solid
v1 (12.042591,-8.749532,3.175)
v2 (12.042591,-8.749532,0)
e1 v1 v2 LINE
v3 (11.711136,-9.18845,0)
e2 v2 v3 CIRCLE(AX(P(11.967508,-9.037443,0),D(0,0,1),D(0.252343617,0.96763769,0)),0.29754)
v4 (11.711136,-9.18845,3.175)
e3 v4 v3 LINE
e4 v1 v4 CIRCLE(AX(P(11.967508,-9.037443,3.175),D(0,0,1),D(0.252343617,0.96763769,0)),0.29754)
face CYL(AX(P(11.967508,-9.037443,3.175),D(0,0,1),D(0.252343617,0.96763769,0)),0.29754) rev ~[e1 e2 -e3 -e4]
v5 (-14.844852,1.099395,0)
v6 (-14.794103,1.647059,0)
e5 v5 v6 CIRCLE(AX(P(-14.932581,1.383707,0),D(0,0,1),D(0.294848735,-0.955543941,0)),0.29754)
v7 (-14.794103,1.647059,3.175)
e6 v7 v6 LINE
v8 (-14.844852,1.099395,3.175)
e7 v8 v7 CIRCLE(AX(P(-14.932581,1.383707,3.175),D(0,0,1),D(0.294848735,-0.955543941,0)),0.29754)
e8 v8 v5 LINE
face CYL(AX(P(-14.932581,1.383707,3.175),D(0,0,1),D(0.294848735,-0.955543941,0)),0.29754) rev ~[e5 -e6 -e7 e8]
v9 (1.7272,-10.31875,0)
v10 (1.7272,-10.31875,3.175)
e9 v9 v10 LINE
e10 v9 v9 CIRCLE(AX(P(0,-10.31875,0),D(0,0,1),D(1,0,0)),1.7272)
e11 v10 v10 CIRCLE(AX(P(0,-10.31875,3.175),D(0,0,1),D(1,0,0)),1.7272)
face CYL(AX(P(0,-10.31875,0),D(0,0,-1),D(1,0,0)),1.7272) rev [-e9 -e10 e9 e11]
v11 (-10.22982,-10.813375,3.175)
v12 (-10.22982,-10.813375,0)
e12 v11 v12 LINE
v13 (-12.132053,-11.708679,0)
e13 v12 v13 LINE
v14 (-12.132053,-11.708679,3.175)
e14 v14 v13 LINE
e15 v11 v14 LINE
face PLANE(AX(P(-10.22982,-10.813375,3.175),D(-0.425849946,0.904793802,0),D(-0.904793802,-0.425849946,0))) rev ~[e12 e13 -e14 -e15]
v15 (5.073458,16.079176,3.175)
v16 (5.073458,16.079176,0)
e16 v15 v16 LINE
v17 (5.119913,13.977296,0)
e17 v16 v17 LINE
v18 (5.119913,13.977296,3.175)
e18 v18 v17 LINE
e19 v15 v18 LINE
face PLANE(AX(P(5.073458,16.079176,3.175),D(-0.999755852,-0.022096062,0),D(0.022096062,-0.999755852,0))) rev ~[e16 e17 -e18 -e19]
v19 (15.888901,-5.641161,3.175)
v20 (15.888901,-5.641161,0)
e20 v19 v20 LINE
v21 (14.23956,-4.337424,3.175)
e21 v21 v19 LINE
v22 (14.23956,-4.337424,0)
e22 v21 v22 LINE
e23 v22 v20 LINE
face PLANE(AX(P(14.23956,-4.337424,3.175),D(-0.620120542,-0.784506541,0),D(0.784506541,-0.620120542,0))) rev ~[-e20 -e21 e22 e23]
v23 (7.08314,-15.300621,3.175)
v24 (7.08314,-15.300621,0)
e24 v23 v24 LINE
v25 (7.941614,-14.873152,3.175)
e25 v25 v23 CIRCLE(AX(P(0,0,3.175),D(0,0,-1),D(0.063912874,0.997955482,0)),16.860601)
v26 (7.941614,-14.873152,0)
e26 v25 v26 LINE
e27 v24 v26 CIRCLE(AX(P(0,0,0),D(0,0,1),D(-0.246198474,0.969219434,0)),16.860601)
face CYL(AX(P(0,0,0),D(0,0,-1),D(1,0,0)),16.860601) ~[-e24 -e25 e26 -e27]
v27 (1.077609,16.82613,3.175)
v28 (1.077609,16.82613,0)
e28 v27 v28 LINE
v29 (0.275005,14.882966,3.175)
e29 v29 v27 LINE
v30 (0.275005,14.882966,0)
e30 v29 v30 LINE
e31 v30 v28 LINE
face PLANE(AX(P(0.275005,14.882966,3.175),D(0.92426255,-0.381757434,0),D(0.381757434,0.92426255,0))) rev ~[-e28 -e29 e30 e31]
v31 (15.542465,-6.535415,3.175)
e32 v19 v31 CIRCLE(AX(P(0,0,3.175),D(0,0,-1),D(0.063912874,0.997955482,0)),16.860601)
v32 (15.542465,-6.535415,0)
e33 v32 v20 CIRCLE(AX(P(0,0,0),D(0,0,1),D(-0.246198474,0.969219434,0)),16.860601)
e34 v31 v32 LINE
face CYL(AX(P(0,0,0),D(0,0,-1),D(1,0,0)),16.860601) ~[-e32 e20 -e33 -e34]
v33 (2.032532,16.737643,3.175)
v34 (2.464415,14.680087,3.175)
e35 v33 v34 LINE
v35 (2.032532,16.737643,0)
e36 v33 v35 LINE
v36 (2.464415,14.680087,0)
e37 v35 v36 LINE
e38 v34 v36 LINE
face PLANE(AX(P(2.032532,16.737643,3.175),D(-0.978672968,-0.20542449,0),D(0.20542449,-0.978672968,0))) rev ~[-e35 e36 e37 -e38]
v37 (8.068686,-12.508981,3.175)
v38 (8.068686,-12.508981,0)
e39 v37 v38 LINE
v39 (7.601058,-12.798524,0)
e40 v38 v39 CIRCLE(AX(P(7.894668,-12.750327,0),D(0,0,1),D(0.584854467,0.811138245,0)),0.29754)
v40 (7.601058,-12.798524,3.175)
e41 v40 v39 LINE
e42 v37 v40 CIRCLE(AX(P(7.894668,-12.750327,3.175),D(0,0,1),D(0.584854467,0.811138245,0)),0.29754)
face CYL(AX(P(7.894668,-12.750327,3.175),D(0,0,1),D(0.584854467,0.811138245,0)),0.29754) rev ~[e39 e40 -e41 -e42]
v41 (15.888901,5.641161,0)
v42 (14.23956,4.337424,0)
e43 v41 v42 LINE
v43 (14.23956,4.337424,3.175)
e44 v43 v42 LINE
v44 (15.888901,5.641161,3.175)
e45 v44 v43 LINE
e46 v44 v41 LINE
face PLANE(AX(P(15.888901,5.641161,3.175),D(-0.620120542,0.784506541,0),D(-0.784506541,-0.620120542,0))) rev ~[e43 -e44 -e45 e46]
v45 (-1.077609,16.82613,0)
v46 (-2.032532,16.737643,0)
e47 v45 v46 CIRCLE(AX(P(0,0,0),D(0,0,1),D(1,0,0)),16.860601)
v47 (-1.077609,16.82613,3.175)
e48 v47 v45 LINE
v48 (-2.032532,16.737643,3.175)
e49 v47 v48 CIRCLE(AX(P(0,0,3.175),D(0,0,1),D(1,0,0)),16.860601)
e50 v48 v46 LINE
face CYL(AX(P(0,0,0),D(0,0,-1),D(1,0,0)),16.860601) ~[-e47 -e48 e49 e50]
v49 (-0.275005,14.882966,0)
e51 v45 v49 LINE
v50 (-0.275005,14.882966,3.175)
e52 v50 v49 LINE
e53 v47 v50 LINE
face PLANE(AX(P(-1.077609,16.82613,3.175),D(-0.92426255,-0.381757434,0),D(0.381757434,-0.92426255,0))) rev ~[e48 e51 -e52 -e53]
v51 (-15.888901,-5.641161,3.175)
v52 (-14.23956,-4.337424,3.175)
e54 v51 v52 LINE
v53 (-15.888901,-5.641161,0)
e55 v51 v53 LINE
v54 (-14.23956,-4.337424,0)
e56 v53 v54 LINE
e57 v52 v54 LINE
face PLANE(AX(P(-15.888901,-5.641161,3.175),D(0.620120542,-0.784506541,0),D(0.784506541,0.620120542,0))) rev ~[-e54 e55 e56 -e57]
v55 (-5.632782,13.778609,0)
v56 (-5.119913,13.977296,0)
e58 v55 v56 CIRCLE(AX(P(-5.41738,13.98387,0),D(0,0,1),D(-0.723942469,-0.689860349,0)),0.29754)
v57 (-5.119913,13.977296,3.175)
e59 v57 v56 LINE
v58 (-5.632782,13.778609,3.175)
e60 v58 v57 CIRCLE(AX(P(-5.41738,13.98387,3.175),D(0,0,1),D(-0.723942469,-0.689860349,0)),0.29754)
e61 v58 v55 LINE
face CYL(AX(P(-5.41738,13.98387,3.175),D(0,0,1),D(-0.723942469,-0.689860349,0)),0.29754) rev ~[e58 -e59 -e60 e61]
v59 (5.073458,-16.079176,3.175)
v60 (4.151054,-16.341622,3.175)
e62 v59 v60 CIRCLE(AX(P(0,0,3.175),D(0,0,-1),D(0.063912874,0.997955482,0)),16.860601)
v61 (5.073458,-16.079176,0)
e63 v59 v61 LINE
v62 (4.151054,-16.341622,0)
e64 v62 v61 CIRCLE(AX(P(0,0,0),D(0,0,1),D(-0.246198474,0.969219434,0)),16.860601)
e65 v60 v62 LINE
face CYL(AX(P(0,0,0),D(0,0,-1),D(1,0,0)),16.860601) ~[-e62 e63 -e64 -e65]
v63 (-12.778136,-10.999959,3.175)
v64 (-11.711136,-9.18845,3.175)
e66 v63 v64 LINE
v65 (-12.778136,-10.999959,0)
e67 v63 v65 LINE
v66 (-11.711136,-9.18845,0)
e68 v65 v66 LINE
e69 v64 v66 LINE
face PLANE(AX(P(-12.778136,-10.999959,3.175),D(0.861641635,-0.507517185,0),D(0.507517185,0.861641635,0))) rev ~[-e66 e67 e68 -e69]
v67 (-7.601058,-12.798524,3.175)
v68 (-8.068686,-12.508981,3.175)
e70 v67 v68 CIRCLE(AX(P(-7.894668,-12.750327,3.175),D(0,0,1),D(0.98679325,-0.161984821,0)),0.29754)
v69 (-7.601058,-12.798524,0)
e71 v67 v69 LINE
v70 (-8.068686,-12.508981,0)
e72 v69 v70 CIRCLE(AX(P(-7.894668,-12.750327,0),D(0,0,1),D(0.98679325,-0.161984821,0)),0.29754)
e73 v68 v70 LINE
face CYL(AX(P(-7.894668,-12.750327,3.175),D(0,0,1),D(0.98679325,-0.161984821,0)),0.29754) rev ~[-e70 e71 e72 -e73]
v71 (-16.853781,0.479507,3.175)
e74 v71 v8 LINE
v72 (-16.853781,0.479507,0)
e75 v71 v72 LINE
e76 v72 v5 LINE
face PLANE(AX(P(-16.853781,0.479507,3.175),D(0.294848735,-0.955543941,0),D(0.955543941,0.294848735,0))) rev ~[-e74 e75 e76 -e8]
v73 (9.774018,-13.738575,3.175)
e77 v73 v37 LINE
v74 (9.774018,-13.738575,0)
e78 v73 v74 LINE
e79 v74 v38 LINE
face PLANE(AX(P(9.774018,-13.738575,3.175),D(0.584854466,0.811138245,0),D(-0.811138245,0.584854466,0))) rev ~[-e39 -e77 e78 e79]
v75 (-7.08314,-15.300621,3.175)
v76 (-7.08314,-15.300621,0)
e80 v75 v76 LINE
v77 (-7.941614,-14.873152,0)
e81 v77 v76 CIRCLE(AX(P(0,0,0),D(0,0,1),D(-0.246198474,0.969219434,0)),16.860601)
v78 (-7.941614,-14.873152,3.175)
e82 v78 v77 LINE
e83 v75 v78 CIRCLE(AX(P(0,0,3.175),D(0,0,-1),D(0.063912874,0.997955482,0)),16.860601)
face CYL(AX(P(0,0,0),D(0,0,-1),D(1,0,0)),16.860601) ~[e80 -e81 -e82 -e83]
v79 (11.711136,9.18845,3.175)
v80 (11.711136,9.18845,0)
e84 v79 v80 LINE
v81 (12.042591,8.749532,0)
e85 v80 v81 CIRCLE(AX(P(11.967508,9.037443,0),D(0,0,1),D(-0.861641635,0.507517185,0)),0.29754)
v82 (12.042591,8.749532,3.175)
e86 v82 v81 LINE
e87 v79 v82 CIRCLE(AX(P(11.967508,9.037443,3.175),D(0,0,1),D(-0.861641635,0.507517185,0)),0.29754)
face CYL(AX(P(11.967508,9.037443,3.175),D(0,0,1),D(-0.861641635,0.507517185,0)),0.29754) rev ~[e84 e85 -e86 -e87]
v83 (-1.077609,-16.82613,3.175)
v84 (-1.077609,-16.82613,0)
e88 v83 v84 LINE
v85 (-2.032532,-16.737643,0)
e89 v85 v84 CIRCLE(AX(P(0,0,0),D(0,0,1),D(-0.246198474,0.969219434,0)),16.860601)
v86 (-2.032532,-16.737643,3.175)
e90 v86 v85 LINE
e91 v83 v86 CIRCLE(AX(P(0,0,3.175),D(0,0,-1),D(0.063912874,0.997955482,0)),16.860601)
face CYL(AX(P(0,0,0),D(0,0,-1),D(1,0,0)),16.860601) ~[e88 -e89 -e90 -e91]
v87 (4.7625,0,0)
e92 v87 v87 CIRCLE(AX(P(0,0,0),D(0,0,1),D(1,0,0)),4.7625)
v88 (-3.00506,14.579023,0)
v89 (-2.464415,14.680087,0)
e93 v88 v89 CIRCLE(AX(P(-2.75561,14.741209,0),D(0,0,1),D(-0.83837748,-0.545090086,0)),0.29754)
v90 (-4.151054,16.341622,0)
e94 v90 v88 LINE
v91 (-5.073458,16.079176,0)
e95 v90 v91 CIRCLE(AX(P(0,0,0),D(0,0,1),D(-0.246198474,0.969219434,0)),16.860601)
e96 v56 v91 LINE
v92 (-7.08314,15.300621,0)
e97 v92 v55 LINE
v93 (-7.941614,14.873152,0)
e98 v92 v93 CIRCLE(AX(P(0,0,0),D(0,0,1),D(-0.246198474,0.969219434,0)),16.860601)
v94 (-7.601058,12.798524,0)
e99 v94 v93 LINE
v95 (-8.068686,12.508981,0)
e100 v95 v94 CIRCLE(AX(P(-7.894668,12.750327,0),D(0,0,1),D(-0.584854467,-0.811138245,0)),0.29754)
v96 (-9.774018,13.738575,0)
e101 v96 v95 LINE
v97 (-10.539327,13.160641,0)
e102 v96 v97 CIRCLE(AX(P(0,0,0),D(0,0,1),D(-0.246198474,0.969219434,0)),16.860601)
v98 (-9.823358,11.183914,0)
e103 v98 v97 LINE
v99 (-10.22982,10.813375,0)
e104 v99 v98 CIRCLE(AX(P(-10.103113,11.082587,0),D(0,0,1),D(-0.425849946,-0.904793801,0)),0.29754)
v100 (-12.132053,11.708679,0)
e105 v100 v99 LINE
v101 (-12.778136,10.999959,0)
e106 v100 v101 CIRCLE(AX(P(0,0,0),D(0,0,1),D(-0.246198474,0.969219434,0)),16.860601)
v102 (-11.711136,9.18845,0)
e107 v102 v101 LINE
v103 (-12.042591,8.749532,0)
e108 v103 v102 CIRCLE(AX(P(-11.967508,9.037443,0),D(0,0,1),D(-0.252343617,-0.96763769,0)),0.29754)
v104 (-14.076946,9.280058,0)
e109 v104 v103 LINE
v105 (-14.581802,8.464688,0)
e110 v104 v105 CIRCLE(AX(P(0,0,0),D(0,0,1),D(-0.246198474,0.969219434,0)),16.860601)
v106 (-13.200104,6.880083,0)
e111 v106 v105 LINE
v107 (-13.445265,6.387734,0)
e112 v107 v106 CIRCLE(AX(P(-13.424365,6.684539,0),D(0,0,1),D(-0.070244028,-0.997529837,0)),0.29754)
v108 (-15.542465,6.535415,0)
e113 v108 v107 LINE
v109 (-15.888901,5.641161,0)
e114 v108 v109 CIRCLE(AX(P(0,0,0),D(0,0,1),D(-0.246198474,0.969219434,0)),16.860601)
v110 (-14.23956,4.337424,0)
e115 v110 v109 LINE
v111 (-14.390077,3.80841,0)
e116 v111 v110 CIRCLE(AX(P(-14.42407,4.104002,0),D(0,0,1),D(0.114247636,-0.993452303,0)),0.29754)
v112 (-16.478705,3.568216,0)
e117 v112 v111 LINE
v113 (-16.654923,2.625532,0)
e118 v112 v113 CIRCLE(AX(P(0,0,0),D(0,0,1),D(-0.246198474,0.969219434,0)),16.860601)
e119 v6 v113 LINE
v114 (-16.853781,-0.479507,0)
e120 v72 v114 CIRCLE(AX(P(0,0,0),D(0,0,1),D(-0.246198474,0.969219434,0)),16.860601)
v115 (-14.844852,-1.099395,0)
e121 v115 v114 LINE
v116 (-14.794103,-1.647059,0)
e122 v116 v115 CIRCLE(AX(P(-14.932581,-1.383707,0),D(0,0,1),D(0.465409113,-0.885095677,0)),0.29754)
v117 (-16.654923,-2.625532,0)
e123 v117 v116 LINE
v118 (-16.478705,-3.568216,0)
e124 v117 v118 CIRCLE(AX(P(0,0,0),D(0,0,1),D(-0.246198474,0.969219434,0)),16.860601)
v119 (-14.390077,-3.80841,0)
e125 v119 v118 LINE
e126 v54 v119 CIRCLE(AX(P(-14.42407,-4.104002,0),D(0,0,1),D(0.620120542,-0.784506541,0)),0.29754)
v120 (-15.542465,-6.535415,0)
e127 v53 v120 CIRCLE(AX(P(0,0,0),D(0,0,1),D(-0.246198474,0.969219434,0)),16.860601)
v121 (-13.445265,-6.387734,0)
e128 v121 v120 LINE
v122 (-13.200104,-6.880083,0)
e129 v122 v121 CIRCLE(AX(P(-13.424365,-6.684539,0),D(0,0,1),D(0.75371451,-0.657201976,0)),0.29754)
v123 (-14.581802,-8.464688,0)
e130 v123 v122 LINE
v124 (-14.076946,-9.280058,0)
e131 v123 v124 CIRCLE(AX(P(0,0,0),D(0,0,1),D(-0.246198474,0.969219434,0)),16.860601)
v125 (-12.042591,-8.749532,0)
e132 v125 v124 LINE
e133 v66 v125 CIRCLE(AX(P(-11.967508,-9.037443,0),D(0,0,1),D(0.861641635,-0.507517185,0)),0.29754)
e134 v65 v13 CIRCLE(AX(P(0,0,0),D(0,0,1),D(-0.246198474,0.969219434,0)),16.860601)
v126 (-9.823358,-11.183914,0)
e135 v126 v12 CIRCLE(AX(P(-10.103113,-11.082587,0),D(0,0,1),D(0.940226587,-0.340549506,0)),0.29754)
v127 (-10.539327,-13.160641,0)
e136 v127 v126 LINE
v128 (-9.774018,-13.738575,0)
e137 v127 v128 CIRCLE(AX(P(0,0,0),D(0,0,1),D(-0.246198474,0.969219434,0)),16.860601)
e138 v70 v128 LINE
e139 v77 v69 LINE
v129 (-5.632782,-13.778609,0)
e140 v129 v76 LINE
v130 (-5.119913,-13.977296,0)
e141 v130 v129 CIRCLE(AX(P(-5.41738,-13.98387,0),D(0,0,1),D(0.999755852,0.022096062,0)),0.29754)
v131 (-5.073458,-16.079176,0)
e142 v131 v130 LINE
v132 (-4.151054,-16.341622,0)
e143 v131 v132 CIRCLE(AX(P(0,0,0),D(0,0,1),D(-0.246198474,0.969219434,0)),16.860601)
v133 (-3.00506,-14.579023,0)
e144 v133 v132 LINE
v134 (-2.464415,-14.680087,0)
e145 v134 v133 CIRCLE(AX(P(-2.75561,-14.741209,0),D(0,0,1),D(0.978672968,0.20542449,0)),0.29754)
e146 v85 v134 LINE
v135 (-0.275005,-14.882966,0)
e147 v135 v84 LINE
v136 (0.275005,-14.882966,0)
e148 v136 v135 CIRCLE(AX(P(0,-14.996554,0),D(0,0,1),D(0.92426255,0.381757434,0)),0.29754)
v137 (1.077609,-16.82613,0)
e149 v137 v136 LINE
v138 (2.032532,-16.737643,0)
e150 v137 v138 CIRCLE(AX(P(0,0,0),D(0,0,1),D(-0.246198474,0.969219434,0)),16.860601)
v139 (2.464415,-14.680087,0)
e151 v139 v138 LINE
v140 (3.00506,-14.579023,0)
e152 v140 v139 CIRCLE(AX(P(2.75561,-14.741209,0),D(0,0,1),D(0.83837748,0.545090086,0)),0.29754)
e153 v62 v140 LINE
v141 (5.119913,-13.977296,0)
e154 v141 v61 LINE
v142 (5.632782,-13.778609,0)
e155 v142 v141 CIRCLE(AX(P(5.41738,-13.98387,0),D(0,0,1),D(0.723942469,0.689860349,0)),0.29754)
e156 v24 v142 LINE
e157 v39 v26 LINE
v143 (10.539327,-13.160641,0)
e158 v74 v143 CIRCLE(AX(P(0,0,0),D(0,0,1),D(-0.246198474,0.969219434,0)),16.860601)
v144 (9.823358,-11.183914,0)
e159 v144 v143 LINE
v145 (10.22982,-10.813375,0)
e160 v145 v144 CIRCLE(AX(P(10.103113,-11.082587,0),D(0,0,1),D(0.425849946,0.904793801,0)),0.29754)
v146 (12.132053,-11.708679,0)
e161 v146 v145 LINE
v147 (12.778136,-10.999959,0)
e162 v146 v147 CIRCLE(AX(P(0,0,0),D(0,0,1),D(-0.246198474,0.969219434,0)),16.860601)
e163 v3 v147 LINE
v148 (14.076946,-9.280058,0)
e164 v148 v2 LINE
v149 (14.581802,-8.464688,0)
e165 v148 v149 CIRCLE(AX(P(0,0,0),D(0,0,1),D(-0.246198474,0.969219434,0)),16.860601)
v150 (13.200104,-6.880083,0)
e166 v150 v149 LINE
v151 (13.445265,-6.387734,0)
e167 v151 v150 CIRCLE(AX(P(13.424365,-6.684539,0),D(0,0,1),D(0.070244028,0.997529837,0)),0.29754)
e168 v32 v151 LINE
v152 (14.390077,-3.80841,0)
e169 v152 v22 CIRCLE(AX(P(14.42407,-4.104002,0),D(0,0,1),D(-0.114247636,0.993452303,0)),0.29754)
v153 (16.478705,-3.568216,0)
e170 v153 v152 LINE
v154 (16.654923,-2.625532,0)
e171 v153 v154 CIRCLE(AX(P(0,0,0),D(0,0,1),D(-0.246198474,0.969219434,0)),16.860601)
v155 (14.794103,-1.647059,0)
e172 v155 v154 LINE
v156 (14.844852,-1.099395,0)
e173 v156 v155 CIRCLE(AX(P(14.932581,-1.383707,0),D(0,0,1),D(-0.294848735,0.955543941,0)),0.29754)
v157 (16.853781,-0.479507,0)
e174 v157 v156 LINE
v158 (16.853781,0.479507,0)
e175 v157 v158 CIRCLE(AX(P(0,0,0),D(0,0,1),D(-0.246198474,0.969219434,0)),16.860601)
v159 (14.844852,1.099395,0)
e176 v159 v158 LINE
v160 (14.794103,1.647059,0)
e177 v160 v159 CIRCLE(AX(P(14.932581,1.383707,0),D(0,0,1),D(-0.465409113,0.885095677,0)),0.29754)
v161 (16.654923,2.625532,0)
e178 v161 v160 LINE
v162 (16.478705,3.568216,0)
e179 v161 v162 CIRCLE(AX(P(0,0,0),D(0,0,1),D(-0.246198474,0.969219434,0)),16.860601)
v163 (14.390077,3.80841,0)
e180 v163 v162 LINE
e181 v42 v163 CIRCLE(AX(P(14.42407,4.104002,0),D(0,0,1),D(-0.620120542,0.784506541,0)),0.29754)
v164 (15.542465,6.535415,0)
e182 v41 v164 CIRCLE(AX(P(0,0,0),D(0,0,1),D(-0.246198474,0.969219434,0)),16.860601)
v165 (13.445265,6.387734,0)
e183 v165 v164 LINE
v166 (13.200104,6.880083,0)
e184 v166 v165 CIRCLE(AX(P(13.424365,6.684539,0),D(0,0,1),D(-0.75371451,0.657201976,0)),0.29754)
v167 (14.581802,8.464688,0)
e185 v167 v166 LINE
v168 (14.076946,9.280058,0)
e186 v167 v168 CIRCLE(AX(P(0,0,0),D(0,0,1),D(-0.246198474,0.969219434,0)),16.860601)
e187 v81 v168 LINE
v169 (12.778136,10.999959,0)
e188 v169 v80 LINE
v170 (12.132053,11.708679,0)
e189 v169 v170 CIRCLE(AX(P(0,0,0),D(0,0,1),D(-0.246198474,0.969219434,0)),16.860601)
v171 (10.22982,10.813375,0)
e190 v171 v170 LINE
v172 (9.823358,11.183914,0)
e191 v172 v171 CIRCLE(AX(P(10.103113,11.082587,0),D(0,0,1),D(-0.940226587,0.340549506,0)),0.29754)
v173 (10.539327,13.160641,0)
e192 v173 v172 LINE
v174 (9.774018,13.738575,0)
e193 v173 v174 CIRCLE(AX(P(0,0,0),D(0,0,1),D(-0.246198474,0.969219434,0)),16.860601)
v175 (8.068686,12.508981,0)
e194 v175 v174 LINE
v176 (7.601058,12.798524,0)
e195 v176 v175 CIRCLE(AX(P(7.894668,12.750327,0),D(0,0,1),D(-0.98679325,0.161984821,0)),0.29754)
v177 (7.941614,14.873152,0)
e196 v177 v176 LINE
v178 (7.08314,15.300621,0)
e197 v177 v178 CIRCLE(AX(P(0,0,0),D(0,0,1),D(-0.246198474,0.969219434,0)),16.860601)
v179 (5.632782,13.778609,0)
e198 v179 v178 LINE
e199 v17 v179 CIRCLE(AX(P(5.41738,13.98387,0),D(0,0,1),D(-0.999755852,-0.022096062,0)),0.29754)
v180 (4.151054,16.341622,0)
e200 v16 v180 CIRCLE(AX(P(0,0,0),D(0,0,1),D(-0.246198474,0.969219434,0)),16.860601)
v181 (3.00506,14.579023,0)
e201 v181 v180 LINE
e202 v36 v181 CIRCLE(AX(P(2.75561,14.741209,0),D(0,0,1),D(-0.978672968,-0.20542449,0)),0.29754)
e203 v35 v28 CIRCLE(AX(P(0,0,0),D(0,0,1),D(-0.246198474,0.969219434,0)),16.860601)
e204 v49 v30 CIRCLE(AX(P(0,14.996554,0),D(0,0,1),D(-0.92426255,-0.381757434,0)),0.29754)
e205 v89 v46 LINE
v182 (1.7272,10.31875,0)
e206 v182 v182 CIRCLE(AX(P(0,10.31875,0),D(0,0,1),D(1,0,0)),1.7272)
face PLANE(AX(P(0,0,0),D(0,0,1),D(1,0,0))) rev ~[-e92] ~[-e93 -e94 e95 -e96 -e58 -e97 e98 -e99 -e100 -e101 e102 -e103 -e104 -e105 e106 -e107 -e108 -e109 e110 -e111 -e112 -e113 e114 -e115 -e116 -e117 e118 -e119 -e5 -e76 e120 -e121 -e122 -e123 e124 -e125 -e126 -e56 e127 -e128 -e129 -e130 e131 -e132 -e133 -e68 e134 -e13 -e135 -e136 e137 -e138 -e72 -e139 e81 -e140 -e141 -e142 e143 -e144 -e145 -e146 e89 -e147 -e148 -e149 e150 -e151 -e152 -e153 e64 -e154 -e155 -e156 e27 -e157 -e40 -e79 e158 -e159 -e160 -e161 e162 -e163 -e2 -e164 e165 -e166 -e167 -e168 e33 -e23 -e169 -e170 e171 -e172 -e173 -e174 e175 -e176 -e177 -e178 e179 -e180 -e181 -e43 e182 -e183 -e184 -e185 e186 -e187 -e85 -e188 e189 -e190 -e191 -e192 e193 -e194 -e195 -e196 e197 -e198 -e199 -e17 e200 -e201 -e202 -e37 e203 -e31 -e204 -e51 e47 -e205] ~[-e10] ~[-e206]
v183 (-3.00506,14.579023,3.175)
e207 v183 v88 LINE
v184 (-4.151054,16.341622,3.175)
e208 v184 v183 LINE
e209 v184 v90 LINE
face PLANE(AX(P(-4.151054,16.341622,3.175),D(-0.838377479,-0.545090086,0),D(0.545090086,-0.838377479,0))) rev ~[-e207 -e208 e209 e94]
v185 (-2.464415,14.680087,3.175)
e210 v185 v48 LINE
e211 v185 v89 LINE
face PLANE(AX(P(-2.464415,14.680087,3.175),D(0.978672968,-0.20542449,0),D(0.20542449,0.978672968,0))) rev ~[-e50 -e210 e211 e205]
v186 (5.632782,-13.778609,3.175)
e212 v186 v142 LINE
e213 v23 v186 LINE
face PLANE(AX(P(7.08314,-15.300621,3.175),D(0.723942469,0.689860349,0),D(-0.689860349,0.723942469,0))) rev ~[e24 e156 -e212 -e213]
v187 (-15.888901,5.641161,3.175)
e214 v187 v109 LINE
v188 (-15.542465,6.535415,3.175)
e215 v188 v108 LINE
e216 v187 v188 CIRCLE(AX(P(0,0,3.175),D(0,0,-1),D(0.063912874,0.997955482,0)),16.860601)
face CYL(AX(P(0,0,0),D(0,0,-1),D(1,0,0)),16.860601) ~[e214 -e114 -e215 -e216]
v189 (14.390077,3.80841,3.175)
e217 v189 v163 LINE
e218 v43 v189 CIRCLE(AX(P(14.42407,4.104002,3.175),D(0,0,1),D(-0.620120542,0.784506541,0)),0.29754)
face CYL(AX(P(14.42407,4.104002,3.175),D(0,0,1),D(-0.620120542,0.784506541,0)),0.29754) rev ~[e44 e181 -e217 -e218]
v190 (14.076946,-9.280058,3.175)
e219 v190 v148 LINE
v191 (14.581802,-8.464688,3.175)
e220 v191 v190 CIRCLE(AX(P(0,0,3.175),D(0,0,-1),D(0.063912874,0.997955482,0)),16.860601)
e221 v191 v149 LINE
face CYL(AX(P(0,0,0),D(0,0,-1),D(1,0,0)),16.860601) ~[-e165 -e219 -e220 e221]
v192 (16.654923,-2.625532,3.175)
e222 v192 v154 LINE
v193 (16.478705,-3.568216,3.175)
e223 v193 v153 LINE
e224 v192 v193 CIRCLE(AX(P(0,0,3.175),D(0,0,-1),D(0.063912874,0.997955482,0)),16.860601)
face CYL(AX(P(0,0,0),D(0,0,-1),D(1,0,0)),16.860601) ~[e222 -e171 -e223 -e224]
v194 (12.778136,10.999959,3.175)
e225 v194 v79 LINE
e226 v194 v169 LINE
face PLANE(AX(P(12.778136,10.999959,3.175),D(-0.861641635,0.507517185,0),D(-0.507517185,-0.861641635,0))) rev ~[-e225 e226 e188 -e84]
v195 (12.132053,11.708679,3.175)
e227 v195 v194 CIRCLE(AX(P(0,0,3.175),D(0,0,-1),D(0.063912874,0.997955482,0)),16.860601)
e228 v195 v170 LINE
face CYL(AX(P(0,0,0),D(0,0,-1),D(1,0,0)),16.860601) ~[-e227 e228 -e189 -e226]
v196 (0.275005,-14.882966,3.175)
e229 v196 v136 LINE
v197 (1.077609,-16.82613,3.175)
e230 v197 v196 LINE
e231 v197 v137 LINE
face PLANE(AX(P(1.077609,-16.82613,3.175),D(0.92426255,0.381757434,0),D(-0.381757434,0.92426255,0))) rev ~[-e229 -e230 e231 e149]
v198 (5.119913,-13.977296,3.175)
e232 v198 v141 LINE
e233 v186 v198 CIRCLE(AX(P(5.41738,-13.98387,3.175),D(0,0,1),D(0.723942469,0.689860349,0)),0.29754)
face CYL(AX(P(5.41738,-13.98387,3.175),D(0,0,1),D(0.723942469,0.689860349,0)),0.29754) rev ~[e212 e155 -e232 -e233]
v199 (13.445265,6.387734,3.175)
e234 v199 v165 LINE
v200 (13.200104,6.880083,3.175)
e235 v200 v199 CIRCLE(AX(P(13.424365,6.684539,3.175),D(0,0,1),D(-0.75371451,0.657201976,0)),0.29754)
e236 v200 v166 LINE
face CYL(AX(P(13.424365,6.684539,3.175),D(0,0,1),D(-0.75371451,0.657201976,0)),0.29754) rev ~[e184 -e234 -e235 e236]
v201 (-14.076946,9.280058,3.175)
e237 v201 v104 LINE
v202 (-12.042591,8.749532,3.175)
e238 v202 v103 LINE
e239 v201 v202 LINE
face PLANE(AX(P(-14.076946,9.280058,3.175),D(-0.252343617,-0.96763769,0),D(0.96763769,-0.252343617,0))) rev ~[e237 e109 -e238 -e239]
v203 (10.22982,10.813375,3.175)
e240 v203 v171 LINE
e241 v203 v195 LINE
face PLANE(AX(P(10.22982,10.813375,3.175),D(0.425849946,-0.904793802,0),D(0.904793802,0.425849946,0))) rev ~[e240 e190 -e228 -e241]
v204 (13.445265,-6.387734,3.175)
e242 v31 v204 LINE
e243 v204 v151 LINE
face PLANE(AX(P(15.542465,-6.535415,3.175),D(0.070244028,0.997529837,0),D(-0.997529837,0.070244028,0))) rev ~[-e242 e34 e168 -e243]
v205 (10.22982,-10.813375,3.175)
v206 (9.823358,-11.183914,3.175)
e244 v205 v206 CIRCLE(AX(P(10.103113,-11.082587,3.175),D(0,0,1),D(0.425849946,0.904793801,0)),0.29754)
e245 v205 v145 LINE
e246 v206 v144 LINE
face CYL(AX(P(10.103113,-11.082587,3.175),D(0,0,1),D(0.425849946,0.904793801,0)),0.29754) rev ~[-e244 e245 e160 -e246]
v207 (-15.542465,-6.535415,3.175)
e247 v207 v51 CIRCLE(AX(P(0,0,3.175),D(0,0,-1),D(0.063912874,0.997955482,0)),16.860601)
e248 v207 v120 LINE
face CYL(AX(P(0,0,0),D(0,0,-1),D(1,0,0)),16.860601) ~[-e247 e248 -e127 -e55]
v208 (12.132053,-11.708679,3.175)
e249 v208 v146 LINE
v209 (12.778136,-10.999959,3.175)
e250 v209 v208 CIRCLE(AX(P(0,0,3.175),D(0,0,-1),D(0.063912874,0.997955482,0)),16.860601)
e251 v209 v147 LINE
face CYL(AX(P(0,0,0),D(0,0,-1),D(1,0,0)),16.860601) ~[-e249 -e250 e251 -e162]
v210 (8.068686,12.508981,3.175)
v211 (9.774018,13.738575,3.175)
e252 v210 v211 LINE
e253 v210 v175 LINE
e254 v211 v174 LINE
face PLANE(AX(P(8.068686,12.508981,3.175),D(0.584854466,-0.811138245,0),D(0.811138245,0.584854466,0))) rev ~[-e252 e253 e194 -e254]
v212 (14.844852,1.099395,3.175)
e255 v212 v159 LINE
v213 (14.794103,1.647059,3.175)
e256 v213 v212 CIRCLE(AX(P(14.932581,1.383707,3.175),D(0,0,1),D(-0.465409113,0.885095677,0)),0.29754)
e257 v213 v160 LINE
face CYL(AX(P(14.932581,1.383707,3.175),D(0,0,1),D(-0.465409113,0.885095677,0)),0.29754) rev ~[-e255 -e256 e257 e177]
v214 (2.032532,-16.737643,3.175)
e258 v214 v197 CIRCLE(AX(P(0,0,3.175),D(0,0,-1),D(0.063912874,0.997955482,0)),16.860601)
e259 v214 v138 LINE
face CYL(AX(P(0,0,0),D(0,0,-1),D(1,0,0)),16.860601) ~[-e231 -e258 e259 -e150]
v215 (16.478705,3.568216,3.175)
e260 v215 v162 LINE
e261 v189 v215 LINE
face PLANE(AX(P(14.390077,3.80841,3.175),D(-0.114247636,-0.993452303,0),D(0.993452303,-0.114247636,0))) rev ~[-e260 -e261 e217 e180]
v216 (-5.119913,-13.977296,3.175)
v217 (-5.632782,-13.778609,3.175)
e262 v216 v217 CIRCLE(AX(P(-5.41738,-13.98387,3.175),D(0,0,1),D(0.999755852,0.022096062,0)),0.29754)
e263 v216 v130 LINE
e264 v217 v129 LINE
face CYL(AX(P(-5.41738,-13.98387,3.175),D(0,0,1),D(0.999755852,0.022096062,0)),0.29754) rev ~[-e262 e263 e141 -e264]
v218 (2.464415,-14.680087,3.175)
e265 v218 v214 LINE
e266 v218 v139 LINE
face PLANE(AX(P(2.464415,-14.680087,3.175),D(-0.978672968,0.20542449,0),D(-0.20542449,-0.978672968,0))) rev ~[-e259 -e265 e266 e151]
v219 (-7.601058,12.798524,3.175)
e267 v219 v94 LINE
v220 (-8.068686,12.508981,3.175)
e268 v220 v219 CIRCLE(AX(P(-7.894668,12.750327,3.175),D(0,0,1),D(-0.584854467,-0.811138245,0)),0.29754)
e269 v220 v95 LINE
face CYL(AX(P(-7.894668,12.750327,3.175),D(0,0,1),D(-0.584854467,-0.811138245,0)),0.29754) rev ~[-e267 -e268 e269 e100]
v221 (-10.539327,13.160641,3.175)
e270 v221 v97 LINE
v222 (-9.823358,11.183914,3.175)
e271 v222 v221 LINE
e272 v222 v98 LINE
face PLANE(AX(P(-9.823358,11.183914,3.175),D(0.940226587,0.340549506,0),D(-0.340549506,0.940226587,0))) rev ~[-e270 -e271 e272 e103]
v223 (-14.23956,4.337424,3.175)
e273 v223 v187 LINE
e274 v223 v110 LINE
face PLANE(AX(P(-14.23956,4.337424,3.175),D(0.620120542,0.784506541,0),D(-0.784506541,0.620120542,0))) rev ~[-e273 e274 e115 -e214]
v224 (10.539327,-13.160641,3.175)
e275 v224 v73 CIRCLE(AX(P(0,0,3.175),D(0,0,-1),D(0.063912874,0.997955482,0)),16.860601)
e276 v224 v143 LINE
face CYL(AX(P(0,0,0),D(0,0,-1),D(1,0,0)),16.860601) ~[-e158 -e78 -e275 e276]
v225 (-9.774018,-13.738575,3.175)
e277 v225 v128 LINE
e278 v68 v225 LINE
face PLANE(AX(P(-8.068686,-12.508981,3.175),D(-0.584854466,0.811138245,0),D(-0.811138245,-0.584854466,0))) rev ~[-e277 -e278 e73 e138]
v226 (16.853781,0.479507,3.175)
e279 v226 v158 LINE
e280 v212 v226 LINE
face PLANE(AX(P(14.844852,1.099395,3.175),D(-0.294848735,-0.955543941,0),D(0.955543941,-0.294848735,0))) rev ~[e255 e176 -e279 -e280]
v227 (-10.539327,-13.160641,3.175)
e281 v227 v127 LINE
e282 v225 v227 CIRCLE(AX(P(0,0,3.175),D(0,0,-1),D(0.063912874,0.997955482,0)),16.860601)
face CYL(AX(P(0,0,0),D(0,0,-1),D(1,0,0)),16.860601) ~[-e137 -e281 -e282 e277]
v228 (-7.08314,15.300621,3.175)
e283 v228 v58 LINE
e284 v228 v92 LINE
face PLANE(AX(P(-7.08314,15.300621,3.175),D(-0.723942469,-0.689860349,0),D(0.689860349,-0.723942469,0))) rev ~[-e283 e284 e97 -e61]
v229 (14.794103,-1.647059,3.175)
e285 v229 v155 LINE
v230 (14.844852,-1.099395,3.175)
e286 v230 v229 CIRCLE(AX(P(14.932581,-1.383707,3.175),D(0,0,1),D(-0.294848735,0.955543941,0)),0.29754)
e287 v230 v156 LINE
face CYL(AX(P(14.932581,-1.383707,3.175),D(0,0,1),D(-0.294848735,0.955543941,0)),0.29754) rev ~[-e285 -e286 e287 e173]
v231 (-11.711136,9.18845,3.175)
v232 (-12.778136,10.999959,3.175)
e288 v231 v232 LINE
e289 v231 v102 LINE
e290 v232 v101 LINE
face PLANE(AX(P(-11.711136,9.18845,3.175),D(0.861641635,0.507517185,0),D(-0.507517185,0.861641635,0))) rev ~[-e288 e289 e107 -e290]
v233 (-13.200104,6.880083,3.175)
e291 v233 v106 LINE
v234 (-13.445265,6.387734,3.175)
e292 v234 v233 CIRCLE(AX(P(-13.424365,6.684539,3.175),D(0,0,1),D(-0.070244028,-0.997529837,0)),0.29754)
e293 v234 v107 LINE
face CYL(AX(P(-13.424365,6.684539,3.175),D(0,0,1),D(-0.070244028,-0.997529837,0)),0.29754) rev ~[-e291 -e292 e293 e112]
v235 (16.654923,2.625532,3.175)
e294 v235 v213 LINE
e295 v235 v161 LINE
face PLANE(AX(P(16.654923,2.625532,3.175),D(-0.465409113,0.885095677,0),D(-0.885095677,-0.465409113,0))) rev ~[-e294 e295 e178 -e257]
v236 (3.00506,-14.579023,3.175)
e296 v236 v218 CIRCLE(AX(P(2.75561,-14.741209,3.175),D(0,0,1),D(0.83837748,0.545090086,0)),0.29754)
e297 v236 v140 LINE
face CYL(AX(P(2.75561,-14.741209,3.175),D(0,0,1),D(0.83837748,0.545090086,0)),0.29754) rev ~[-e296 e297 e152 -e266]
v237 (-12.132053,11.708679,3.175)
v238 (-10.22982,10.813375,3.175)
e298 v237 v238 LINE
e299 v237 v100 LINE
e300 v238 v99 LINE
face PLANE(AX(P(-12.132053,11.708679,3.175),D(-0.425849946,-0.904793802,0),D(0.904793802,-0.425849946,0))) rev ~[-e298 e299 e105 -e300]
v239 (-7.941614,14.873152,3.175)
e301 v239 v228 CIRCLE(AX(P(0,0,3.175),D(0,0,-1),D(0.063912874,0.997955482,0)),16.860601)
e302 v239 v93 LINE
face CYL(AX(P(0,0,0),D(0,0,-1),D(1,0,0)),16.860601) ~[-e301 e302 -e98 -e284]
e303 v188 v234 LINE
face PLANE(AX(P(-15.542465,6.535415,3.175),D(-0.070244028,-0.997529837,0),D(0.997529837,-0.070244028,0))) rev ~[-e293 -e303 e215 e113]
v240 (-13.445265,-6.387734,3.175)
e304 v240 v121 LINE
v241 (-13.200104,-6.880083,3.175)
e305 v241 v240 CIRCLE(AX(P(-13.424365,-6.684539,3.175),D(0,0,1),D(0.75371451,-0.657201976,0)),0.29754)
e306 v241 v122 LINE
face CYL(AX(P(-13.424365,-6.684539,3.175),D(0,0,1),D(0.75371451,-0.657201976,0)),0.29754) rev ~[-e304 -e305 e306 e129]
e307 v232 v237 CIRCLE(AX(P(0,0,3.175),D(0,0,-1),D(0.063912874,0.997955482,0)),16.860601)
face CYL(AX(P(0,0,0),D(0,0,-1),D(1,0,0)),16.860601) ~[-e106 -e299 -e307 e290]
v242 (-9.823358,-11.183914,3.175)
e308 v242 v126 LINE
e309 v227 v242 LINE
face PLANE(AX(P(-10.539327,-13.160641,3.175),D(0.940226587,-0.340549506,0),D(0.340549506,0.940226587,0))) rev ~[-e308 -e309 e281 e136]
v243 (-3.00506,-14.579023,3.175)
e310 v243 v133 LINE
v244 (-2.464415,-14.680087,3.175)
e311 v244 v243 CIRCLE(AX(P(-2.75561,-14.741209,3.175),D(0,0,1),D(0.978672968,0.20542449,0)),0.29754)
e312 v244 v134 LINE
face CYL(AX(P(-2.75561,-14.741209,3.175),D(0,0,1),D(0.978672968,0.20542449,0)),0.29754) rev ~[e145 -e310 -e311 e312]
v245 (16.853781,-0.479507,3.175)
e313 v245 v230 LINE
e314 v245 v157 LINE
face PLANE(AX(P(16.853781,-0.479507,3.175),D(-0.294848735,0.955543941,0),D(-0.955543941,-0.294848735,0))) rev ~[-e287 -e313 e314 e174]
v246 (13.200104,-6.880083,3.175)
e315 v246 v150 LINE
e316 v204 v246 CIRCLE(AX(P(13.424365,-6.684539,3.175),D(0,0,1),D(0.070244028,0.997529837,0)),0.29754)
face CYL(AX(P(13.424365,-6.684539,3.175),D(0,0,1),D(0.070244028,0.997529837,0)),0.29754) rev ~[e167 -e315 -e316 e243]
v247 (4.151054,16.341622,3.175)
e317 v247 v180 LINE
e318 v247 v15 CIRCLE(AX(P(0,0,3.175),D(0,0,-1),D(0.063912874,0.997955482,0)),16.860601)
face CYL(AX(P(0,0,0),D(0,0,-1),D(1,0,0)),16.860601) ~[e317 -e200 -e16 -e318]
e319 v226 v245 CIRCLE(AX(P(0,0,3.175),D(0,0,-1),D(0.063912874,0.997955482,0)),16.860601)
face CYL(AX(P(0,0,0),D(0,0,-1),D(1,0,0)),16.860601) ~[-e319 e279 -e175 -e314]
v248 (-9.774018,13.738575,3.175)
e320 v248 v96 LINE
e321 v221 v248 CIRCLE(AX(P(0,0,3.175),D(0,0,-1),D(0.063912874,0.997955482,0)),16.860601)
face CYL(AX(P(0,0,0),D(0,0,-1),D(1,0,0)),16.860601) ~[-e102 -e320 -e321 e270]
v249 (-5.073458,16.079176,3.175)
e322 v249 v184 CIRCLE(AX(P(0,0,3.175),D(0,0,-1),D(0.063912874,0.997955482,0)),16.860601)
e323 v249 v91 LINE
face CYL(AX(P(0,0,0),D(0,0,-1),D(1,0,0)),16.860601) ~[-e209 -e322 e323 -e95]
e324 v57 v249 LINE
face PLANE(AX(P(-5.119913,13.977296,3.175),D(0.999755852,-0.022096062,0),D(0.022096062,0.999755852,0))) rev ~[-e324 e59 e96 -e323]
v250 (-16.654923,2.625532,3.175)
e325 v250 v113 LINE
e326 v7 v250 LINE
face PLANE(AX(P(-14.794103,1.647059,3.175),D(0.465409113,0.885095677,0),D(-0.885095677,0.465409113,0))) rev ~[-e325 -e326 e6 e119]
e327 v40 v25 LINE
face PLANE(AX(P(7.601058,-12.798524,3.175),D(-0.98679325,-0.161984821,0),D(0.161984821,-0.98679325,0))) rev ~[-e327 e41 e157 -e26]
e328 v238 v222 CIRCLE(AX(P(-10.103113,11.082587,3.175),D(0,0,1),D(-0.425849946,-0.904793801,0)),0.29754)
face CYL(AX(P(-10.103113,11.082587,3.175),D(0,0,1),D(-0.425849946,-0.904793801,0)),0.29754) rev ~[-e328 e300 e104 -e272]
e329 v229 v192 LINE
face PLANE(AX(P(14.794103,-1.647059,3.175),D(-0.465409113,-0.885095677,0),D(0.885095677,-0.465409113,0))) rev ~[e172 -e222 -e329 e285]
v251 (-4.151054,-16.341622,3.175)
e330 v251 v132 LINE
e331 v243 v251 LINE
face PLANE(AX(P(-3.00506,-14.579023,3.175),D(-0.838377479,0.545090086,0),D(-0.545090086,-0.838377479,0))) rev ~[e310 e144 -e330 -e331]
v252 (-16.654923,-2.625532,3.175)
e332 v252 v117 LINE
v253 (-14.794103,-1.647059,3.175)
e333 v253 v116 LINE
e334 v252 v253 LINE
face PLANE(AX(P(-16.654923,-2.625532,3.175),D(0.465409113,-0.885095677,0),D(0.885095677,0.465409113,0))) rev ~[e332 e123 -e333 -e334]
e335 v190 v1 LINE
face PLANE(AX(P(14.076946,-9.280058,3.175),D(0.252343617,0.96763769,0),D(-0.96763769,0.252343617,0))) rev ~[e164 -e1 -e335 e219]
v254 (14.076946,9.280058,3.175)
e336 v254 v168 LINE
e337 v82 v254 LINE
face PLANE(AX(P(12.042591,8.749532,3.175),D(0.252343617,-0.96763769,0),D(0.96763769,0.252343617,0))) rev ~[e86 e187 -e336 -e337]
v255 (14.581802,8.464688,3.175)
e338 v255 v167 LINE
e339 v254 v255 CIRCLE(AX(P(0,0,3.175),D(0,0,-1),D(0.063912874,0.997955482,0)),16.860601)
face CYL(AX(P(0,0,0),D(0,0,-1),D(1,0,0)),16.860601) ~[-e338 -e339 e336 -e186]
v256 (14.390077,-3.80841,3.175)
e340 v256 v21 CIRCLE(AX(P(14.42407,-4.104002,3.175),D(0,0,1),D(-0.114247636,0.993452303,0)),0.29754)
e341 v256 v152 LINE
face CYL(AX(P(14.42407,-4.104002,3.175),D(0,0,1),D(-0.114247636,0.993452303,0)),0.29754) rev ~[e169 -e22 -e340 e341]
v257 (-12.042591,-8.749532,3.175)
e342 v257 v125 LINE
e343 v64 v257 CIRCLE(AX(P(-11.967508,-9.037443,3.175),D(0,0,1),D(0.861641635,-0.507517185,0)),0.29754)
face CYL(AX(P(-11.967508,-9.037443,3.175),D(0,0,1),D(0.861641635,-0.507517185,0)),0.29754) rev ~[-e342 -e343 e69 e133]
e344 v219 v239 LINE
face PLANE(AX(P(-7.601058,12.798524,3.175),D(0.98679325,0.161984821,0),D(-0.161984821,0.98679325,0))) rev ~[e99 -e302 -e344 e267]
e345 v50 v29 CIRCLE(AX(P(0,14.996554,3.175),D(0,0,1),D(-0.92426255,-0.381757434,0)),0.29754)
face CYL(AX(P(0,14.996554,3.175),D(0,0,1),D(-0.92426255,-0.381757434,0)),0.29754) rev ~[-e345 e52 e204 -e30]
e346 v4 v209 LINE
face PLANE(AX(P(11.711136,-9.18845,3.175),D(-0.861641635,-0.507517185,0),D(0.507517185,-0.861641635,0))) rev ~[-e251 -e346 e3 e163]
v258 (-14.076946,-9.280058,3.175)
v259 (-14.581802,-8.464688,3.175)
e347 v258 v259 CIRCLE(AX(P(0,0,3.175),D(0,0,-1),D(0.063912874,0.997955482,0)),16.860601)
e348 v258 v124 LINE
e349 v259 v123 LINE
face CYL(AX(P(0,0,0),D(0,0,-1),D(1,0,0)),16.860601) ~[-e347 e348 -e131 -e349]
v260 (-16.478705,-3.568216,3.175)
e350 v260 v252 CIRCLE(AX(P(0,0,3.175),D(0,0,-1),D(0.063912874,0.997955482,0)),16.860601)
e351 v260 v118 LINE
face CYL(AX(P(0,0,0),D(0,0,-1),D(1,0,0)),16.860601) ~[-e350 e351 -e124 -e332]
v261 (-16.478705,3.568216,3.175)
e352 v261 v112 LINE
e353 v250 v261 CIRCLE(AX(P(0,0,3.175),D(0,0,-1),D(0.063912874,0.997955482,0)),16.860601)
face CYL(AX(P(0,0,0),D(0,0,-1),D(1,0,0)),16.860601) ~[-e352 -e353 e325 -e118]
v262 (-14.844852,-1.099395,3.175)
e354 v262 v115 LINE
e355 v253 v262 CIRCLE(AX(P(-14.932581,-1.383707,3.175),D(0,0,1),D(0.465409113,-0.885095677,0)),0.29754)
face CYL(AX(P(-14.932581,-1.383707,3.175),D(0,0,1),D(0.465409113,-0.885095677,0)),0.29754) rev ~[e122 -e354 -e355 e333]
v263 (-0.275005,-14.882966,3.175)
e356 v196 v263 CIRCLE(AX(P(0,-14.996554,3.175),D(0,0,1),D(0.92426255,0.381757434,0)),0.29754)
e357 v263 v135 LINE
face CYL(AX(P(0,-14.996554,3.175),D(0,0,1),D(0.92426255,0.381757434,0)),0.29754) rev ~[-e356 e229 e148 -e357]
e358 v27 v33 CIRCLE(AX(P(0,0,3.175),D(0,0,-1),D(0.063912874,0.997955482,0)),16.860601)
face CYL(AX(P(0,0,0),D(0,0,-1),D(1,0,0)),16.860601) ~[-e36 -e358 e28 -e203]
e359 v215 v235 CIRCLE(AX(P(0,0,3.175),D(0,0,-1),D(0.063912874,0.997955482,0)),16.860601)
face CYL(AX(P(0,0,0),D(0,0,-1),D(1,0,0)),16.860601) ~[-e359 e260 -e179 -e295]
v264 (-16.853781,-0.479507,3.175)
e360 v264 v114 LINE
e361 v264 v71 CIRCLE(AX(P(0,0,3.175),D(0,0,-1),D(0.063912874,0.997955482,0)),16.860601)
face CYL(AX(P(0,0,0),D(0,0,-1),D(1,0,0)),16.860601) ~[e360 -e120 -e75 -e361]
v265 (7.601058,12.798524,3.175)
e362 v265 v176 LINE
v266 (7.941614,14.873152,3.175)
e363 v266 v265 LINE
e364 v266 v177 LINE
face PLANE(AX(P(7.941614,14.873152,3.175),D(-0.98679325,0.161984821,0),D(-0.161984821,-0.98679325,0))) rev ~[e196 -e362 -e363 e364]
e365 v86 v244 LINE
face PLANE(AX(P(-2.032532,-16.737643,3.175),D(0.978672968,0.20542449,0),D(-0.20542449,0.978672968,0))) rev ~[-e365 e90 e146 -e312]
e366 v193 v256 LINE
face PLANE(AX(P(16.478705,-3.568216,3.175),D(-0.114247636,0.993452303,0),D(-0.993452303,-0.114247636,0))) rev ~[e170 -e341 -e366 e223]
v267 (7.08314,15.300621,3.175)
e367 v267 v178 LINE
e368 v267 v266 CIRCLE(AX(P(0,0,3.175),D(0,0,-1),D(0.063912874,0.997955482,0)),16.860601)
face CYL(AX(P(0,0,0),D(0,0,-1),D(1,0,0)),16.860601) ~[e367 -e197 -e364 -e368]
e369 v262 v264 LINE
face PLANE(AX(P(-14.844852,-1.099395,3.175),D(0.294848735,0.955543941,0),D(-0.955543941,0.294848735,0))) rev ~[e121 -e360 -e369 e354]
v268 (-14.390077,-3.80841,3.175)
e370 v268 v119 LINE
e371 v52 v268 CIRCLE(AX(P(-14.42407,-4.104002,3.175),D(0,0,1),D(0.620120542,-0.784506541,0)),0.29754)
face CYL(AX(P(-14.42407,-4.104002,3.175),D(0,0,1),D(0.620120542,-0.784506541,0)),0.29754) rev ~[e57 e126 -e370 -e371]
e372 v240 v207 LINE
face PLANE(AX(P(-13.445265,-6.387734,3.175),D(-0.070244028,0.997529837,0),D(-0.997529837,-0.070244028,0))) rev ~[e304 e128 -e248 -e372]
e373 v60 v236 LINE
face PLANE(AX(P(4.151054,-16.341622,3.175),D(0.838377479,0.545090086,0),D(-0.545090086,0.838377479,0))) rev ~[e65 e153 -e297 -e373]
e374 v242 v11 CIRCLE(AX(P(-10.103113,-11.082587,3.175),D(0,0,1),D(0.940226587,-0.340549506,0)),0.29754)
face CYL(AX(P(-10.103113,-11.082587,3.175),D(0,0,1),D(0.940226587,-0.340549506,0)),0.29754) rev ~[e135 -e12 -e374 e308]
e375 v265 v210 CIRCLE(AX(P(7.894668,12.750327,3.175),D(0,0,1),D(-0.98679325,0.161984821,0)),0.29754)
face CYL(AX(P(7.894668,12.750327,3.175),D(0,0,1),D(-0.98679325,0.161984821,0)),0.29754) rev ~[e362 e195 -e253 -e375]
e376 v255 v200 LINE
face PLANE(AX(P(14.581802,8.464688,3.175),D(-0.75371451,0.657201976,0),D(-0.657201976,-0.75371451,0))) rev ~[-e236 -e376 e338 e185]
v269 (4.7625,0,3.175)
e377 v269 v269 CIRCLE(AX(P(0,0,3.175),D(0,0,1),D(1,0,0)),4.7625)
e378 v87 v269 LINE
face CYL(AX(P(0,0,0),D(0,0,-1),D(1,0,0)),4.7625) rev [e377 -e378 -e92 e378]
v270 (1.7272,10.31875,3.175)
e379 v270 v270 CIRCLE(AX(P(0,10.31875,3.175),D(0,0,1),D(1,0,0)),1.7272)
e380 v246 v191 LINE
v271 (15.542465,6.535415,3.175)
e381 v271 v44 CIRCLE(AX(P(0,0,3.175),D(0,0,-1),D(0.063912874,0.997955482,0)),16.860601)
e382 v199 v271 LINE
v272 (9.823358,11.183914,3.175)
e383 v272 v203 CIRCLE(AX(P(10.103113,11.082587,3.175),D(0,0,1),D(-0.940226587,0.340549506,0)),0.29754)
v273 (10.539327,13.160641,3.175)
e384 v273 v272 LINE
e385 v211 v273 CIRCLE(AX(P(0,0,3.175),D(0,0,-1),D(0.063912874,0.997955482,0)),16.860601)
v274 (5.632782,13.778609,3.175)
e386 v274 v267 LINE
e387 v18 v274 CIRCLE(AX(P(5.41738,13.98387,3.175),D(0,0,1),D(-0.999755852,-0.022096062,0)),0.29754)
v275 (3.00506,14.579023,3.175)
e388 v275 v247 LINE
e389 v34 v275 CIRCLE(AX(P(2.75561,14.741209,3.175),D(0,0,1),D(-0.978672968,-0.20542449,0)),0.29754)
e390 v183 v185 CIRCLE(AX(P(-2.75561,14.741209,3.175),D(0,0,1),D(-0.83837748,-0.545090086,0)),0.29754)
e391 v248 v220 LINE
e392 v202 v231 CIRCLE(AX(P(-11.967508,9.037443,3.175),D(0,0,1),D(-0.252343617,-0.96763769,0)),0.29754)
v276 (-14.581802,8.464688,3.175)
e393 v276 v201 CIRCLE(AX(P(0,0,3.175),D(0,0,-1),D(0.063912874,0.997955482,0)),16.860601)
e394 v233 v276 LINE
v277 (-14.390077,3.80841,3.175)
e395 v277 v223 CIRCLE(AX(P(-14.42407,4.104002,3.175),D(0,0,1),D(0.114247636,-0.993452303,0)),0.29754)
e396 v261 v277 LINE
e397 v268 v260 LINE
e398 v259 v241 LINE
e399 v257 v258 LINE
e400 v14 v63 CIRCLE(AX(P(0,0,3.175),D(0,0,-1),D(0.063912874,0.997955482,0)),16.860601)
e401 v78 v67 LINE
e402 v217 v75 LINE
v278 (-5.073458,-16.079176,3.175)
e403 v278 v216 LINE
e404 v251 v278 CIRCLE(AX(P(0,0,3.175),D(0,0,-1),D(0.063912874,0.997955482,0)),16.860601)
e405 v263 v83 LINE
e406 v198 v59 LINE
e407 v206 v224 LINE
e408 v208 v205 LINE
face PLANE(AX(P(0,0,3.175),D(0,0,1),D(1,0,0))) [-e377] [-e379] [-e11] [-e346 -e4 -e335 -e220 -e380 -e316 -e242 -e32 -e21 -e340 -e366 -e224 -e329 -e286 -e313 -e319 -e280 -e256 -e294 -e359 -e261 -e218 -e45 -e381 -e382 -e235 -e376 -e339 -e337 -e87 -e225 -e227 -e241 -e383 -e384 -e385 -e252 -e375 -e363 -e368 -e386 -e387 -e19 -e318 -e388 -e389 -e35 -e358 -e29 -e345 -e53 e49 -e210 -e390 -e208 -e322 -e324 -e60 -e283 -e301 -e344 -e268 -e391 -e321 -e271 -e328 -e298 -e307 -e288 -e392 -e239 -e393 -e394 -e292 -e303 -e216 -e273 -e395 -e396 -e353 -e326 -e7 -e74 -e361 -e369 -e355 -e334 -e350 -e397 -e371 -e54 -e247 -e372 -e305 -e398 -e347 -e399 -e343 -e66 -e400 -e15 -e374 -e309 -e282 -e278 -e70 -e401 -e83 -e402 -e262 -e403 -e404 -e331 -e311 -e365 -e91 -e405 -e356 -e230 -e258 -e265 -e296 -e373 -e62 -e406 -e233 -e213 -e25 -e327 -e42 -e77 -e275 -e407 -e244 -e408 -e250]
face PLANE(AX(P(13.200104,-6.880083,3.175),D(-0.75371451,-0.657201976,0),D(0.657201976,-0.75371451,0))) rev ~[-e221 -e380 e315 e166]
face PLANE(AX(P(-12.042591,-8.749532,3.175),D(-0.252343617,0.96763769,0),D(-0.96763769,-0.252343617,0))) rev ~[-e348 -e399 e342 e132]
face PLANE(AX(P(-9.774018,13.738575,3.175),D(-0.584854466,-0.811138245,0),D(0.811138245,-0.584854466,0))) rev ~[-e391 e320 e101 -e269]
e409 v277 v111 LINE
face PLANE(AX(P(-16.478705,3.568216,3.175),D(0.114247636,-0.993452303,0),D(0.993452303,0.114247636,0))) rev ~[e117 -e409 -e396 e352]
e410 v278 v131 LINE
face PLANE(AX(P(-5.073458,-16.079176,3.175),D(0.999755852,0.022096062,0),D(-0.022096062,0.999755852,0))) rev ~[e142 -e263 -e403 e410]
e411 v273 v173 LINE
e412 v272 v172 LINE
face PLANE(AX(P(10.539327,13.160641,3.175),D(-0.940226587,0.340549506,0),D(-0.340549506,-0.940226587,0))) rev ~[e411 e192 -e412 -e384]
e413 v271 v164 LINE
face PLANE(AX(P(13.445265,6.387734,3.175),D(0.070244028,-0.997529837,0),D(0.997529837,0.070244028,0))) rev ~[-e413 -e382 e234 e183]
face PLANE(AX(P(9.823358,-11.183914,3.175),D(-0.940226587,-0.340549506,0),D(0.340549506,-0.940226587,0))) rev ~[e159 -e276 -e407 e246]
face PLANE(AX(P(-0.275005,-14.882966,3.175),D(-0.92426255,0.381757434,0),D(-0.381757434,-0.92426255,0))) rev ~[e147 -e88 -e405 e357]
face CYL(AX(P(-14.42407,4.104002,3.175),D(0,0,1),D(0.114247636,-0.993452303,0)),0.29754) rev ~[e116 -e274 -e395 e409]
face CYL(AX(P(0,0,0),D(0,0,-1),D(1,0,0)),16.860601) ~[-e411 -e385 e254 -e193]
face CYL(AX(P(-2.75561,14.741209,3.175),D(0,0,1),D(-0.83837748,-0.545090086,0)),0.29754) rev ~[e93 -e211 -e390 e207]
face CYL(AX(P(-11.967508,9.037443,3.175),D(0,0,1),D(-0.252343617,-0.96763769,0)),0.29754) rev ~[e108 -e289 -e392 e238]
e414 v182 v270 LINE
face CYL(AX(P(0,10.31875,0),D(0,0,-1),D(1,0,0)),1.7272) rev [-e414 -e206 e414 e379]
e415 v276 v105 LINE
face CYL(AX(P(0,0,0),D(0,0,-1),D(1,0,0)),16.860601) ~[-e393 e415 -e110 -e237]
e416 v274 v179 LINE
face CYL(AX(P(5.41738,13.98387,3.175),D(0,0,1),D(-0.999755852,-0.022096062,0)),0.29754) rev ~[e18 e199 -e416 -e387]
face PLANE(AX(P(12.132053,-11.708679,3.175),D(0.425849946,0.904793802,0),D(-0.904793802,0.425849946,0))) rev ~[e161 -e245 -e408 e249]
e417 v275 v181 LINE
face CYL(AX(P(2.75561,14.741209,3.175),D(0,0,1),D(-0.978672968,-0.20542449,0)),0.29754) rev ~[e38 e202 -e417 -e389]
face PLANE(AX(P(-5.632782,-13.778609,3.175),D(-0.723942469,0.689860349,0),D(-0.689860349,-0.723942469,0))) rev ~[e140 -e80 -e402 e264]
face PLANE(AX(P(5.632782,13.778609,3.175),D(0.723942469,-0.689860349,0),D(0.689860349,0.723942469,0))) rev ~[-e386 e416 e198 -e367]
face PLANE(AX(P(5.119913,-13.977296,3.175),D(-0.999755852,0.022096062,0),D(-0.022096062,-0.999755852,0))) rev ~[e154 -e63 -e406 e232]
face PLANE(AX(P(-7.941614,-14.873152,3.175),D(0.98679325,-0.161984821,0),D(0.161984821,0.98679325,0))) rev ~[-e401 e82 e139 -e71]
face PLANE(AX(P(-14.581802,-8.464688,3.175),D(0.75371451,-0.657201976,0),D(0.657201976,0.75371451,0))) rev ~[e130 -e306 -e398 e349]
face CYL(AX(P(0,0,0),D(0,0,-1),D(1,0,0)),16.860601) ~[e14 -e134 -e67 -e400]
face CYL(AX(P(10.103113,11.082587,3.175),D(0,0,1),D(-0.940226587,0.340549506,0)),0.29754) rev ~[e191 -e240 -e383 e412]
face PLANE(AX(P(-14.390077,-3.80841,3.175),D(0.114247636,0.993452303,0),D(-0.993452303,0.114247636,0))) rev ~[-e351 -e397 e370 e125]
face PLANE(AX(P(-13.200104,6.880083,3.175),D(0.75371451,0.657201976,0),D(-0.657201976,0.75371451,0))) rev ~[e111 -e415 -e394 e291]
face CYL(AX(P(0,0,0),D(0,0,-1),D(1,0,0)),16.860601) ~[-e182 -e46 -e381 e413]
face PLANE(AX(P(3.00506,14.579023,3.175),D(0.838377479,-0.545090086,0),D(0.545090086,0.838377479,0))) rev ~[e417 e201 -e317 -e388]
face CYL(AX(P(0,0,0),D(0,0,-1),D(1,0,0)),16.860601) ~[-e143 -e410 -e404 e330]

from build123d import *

# Parameters (mm, degrees)
F0_R            = 16.8606013276
F0_R_2          = 1.7272
F0_R_3          = 4.7625
F1_DEPTH        = 3.175
F3_DEPTH        = 3.175
F3_COPIES_COUNT = 34


# Not quite as in the source:
# - a pattern or mirror of a feature is missing from the dataset's text; its kind, count and spacing are read off the source's solid
# - a feature names something its author has since deleted; it is built from what else it names


with BuildPart() as f1:
    # F0 (on Top) → F1 (new body)
    with BuildSketch(Plane.XY):
        Circle(F0_R)
        with Locations((0, -10.31875)):
            Circle(F0_R_2, mode=Mode.SUBTRACT)
        Circle(F0_R_3, mode=Mode.SUBTRACT)
        with Locations((0, 10.31875)):
            Circle(F0_R_2, mode=Mode.SUBTRACT)
    extrude(amount=F1_DEPTH)

    # F2 (on face) → F3 (cut, through all)
    with BuildSketch(Plane.XY.offset(3.175)):
        with BuildLine():
            Line((0.2750051008, 14.882965874), (1.0776094804, 16.8261295293))
            ThreePointArc((1.0776094804, 16.8261295293), (0, 16.8606013276), (-1.0776094804, 16.8261295293))
            Line((-1.0776094804, 16.8261295293), (-0.2750051008, 14.882965874))
            ThreePointArc((-0.2750051008, 14.882965874), (0, 14.6990139664), (0.2750051008, 14.882965874))
        make_face()
    f3 = extrude(amount=-F3_DEPTH, mode=Mode.SUBTRACT)

    # F3_copies: F3 ×34 about axis
    f3_copies_axis = Axis((0, 0, 0), (0, 0, 1))
    for i in range(1, F3_COPIES_COUNT):
        add(f3.rotate(f3_copies_axis, i * 360 / F3_COPIES_COUNT), mode=Mode.SUBTRACT)


solid = f1.part
